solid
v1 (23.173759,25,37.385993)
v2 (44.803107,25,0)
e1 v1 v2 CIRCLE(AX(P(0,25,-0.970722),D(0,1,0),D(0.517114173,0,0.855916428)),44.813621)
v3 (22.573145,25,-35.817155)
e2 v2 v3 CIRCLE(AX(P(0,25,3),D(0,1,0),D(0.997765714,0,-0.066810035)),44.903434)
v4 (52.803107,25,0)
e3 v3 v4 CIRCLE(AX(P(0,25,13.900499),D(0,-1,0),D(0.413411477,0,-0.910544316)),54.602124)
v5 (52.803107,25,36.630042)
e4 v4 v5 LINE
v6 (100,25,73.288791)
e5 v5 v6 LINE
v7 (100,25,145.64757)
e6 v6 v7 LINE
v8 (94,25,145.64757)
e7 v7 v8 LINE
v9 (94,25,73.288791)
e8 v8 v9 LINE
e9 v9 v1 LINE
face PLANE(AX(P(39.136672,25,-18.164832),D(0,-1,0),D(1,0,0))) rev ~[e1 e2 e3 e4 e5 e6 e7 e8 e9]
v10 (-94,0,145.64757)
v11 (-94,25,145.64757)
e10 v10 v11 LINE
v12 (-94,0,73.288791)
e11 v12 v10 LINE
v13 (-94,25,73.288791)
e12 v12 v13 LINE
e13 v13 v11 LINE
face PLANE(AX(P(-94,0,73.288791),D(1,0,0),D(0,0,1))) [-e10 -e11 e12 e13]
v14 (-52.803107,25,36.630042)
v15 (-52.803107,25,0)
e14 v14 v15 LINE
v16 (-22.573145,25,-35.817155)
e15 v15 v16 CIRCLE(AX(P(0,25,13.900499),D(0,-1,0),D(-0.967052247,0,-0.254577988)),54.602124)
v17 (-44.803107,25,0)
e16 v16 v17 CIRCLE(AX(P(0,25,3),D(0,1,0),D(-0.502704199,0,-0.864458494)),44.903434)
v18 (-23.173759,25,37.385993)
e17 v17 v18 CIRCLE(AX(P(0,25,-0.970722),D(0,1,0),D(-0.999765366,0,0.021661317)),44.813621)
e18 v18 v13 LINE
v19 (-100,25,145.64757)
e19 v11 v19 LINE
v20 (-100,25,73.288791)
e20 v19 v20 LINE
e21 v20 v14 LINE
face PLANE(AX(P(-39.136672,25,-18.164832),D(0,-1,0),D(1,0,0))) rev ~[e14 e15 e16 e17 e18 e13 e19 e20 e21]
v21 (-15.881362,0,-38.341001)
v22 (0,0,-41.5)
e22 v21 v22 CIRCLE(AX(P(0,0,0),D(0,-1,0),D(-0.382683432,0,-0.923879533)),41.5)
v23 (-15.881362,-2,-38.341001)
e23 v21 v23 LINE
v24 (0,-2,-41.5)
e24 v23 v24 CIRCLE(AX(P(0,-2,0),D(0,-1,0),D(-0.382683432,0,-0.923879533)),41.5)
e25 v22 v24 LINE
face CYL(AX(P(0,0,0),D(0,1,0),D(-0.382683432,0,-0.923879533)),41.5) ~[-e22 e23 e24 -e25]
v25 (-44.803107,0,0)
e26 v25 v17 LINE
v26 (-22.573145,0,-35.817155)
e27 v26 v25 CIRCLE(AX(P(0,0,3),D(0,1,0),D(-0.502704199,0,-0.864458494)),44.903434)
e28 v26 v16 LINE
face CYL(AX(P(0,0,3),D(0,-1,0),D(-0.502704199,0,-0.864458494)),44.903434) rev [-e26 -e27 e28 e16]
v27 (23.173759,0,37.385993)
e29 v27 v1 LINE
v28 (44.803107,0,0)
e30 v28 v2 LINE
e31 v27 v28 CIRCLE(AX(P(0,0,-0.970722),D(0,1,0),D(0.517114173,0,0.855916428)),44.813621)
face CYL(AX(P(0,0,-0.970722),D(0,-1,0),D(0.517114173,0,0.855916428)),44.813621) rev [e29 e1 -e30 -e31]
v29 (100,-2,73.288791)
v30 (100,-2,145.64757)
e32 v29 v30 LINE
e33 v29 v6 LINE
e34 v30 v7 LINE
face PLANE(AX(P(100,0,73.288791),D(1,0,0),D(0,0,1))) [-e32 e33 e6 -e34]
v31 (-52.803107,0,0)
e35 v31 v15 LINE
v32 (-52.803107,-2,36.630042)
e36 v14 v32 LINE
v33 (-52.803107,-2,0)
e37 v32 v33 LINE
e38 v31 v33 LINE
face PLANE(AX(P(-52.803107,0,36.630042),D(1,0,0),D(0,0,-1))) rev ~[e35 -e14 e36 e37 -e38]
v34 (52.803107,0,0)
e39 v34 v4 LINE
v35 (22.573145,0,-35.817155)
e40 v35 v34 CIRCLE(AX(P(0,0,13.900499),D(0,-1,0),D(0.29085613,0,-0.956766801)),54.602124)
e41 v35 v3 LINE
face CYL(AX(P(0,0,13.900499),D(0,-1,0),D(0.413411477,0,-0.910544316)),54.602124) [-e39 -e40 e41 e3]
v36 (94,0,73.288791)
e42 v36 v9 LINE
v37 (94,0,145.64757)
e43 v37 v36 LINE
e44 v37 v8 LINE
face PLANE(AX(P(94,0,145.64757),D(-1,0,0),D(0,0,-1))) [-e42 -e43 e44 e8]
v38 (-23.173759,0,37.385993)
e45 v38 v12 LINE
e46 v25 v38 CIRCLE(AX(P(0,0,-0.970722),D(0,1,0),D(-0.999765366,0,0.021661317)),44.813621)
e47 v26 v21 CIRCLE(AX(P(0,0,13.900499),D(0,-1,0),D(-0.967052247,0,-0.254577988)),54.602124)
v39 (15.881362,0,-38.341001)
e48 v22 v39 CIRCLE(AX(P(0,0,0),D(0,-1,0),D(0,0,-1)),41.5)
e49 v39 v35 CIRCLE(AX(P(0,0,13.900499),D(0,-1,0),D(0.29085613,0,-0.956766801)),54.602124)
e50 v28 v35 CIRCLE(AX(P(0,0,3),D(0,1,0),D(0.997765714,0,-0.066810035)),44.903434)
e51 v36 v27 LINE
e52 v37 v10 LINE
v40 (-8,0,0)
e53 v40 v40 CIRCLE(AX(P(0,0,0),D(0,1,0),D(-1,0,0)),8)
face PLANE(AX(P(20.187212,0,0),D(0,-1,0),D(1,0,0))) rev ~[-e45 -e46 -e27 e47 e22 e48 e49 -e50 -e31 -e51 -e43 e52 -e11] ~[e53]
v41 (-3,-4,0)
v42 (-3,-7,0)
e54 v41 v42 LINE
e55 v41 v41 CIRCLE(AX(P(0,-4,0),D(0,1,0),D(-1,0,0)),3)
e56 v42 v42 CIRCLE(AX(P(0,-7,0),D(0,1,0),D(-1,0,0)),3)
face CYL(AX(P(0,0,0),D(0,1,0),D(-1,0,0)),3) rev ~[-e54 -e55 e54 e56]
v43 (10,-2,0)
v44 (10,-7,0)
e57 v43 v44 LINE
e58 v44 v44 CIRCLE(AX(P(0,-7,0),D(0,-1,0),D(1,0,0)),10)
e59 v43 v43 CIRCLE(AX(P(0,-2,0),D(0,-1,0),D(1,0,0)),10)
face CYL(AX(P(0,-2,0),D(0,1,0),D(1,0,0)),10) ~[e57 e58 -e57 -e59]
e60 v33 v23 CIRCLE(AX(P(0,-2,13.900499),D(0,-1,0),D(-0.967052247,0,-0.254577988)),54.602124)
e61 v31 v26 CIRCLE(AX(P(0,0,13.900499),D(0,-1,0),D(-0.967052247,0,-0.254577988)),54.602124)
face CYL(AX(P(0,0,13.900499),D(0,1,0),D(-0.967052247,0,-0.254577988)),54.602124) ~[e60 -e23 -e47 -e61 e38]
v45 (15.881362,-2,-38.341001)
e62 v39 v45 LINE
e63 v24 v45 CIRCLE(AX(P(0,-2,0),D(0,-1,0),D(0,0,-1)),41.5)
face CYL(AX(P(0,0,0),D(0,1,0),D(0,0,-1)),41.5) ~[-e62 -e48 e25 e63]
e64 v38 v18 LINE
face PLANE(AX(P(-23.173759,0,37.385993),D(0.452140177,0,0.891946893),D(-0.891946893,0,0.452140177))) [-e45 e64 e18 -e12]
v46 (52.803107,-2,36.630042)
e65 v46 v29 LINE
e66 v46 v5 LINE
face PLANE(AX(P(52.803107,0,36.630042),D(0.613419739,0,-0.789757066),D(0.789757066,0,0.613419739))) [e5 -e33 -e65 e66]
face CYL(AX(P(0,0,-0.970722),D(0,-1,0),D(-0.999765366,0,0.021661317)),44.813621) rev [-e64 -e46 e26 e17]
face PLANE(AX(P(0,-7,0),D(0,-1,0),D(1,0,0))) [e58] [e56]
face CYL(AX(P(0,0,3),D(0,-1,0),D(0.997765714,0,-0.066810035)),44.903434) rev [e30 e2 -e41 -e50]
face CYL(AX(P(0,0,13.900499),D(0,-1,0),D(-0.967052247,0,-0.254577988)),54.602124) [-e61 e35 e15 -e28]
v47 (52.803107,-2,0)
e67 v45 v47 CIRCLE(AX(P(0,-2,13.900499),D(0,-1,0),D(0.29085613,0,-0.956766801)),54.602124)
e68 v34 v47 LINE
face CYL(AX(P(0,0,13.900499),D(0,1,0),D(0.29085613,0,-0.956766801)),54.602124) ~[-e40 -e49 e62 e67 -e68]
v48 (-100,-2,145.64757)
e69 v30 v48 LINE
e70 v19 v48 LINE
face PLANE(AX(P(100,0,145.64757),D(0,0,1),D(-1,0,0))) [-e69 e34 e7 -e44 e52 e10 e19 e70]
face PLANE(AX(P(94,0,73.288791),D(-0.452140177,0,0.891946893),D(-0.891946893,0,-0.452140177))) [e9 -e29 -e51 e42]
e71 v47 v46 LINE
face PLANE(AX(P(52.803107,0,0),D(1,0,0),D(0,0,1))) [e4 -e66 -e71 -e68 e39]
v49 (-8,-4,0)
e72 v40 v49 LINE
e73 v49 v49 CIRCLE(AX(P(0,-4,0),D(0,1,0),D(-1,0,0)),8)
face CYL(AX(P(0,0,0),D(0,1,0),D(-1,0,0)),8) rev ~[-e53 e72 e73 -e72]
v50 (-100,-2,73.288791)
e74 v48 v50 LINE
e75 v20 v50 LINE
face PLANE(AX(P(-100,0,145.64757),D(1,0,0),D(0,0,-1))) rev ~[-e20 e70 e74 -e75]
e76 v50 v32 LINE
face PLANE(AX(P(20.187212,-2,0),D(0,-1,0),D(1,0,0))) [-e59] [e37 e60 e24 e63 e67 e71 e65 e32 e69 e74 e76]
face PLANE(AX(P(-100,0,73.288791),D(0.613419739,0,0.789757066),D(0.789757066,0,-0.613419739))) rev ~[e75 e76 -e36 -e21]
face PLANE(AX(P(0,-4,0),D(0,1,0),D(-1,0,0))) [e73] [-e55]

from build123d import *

# Parameters (mm, degrees)
F1_DEPTH  = 2
F2_R      = 10
F3_DEPTH  = 5
F4_R      = 8
F5_DEPTH  = 4
F6_R      = 3
F7_DEPTH  = 25
F9_DEPTH  = 25
F11_DEPTH = 25
F12_DEPTH = 25


# Not quite as in the source:
# - a feature names something its author has since deleted; it is built from what else it names


with BuildPart() as f1:
    # F0 (on Front) → F1 (new body)
    with BuildSketch(Plane.XZ):
        with BuildLine():
            Line((0, 0), (15.8813624432, -38.3410005992))
            ThreePointArc((15.8813624432, -38.3410005992), (41.5, 0), (15.8813624432, 38.3410005992))
            Line((15.8813624432, 38.3410005992), (0, 0))
        make_face()
        with BuildLine():
            ThreePointArc((0, -41.5), (8.0962483637, -40.7025891367), (15.8813624432, -38.3410005992))
            Line((15.8813624432, -38.3410005992), (0, 0))
            Line((0, 0), (0, -41.5))
        make_face()
        with BuildLine():
            ThreePointArc((15.8813624432, 38.3410005992), (41.5, 0), (15.8813624432, -38.3410005992))
            ThreePointArc((15.8813624432, -38.3410005992), (39.330613444, -23.9742260076), (52.803106606, 0))
            Line((52.803106606, 0), (52.803106606, 36.6300418973))
            Line((52.803106606, 36.6300418973), (100, 73.2887908816))
            Line((100, 73.2887908816), (100, 145.6475704908))
            Line((100, 145.6475704908), (0, 145.6475704908))
            Line((0, 145.6475704908), (-100, 145.6475704908))
            Line((-100, 145.6475704908), (-100, 73.2887908816))
            Line((-100, 73.2887908816), (-52.803106606, 36.6300418973))
            Line((-52.803106606, 36.6300418973), (-52.803106606, 0))
            ThreePointArc((-52.803106606, 0), (-39.330613444, -23.9742260076), (-15.8813624432, -38.3410005992))
            ThreePointArc((-15.8813624432, -38.3410005992), (-41.5, 0), (-15.8813624432, 38.3410005992))
            ThreePointArc((-15.8813624432, 38.3410005992), (0, 41.5), (15.8813624432, 38.3410005992))
        make_face()
        with BuildLine():
            Line((0, -41.5), (0, 0))
            Line((0, 0), (-15.8813624432, -38.3410005992))
            ThreePointArc((-15.8813624432, -38.3410005992), (-8.0962483637, -40.7025891367), (0, -41.5))
        make_face()
        with BuildLine():
            Line((-15.8813624432, -38.3410005992), (0, 0))
            Line((0, 0), (-15.8813624432, 38.3410005992))
            ThreePointArc((-15.8813624432, 38.3410005992), (-41.5, 0), (-15.8813624432, -38.3410005992))
        make_face()
        with BuildLine():
            Line((0, 0), (15.8813624432, 38.3410005992))
            ThreePointArc((15.8813624432, 38.3410005992), (0, 41.5), (-15.8813624432, 38.3410005992))
            Line((-15.8813624432, 38.3410005992), (0, 0))
        make_face()
    extrude(amount=F1_DEPTH)

    # F2 (on face) → F3 (join)
    with BuildSketch(Plane.XZ.offset(2)):
        Circle(F2_R)
    extrude(amount=F3_DEPTH)

    # F4 (on face) → F5 (cut)
    with BuildSketch(Plane(origin=(0, 0, 0), x_dir=(-1, 0, 0), z_dir=(0, 1, 0))):
        Circle(F4_R)
    extrude(amount=-F5_DEPTH, mode=Mode.SUBTRACT)

    # F6 (on face) → F7 (cut)
    with BuildSketch(Plane(origin=(0, 0, 0), x_dir=(-1, 0, 0), z_dir=(0, 1, 0))):
        Circle(F6_R)
    extrude(amount=-F7_DEPTH, mode=Mode.SUBTRACT)

    # F8 (on face) → F9 (join)
    with BuildSketch(Plane.XZ):
        with BuildLine():
            Line((100, 145.6475704908), (94, 145.6475704908))
            Line((94, 145.6475704908), (94, 73.2887908816))
            Line((94, 73.2887908816), (23.1737587601, 37.3859927058))
            ThreePointArc((23.1737587601, 37.3859927058), (38.7897108638, 21.4707349754), (44.803106606, 0))
            Line((44.803106606, 0), (52.803106606, 0))
            Line((52.803106606, 0), (52.803106606, 36.6300418973))
            Line((52.803106606, 36.6300418973), (100, 73.2887908816))
            Line((100, 73.2887908816), (100, 145.6475704908))
        make_face()
        with BuildLine():
            Line((-100, 145.6475704908), (-100, 73.2887908816))
            Line((-100, 73.2887908816), (-52.803106606, 36.6300418973))
            Line((-52.803106606, 36.6300418973), (-52.803106606, 0))
            Line((-52.803106606, 0), (-44.803106606, 0))
            ThreePointArc((-44.803106606, 0), (-38.7897108638, 21.4707349754), (-23.1737587601, 37.3859927058))
            Line((-23.1737587601, 37.3859927058), (-94, 73.2887908816))
            Line((-94, 73.2887908816), (-94, 143.9662277699))
            Line((-94, 143.9662277699), (-94, 145.6475704908))
            Line((-94, 145.6475704908), (-100, 145.6475704908))
        make_face()
    extrude(amount=-F9_DEPTH)

    # F10 (on face) → F11 (join)
    with BuildSketch(Plane.XZ):
        with BuildLine():
            ThreePointArc((44.803106606, 0), (38.1524173859, -20.6793456236), (22.573144677, -35.8171547249))
            ThreePointArc((22.573144677, -35.8171547249), (41.7266336711, -21.3171100871), (52.803106606, 0))
            Line((52.803106606, 0), (44.803106606, 0))
        make_face()
    extrude(amount=-F11_DEPTH)

    # F10 (on face) → F12 (join)
    with BuildSketch(Plane.XZ):
        with BuildLine():
            ThreePointArc((-52.803106606, 0), (-41.7266336711, -21.3171100871), (-22.573144677, -35.8171547249))
            ThreePointArc((-22.573144677, -35.8171547249), (-38.1524173859, -20.6793456236), (-44.803106606, 0))
            Line((-44.803106606, 0), (-52.803106606, 0))
        make_face()
    extrude(amount=-F12_DEPTH)


solid = f1.part
